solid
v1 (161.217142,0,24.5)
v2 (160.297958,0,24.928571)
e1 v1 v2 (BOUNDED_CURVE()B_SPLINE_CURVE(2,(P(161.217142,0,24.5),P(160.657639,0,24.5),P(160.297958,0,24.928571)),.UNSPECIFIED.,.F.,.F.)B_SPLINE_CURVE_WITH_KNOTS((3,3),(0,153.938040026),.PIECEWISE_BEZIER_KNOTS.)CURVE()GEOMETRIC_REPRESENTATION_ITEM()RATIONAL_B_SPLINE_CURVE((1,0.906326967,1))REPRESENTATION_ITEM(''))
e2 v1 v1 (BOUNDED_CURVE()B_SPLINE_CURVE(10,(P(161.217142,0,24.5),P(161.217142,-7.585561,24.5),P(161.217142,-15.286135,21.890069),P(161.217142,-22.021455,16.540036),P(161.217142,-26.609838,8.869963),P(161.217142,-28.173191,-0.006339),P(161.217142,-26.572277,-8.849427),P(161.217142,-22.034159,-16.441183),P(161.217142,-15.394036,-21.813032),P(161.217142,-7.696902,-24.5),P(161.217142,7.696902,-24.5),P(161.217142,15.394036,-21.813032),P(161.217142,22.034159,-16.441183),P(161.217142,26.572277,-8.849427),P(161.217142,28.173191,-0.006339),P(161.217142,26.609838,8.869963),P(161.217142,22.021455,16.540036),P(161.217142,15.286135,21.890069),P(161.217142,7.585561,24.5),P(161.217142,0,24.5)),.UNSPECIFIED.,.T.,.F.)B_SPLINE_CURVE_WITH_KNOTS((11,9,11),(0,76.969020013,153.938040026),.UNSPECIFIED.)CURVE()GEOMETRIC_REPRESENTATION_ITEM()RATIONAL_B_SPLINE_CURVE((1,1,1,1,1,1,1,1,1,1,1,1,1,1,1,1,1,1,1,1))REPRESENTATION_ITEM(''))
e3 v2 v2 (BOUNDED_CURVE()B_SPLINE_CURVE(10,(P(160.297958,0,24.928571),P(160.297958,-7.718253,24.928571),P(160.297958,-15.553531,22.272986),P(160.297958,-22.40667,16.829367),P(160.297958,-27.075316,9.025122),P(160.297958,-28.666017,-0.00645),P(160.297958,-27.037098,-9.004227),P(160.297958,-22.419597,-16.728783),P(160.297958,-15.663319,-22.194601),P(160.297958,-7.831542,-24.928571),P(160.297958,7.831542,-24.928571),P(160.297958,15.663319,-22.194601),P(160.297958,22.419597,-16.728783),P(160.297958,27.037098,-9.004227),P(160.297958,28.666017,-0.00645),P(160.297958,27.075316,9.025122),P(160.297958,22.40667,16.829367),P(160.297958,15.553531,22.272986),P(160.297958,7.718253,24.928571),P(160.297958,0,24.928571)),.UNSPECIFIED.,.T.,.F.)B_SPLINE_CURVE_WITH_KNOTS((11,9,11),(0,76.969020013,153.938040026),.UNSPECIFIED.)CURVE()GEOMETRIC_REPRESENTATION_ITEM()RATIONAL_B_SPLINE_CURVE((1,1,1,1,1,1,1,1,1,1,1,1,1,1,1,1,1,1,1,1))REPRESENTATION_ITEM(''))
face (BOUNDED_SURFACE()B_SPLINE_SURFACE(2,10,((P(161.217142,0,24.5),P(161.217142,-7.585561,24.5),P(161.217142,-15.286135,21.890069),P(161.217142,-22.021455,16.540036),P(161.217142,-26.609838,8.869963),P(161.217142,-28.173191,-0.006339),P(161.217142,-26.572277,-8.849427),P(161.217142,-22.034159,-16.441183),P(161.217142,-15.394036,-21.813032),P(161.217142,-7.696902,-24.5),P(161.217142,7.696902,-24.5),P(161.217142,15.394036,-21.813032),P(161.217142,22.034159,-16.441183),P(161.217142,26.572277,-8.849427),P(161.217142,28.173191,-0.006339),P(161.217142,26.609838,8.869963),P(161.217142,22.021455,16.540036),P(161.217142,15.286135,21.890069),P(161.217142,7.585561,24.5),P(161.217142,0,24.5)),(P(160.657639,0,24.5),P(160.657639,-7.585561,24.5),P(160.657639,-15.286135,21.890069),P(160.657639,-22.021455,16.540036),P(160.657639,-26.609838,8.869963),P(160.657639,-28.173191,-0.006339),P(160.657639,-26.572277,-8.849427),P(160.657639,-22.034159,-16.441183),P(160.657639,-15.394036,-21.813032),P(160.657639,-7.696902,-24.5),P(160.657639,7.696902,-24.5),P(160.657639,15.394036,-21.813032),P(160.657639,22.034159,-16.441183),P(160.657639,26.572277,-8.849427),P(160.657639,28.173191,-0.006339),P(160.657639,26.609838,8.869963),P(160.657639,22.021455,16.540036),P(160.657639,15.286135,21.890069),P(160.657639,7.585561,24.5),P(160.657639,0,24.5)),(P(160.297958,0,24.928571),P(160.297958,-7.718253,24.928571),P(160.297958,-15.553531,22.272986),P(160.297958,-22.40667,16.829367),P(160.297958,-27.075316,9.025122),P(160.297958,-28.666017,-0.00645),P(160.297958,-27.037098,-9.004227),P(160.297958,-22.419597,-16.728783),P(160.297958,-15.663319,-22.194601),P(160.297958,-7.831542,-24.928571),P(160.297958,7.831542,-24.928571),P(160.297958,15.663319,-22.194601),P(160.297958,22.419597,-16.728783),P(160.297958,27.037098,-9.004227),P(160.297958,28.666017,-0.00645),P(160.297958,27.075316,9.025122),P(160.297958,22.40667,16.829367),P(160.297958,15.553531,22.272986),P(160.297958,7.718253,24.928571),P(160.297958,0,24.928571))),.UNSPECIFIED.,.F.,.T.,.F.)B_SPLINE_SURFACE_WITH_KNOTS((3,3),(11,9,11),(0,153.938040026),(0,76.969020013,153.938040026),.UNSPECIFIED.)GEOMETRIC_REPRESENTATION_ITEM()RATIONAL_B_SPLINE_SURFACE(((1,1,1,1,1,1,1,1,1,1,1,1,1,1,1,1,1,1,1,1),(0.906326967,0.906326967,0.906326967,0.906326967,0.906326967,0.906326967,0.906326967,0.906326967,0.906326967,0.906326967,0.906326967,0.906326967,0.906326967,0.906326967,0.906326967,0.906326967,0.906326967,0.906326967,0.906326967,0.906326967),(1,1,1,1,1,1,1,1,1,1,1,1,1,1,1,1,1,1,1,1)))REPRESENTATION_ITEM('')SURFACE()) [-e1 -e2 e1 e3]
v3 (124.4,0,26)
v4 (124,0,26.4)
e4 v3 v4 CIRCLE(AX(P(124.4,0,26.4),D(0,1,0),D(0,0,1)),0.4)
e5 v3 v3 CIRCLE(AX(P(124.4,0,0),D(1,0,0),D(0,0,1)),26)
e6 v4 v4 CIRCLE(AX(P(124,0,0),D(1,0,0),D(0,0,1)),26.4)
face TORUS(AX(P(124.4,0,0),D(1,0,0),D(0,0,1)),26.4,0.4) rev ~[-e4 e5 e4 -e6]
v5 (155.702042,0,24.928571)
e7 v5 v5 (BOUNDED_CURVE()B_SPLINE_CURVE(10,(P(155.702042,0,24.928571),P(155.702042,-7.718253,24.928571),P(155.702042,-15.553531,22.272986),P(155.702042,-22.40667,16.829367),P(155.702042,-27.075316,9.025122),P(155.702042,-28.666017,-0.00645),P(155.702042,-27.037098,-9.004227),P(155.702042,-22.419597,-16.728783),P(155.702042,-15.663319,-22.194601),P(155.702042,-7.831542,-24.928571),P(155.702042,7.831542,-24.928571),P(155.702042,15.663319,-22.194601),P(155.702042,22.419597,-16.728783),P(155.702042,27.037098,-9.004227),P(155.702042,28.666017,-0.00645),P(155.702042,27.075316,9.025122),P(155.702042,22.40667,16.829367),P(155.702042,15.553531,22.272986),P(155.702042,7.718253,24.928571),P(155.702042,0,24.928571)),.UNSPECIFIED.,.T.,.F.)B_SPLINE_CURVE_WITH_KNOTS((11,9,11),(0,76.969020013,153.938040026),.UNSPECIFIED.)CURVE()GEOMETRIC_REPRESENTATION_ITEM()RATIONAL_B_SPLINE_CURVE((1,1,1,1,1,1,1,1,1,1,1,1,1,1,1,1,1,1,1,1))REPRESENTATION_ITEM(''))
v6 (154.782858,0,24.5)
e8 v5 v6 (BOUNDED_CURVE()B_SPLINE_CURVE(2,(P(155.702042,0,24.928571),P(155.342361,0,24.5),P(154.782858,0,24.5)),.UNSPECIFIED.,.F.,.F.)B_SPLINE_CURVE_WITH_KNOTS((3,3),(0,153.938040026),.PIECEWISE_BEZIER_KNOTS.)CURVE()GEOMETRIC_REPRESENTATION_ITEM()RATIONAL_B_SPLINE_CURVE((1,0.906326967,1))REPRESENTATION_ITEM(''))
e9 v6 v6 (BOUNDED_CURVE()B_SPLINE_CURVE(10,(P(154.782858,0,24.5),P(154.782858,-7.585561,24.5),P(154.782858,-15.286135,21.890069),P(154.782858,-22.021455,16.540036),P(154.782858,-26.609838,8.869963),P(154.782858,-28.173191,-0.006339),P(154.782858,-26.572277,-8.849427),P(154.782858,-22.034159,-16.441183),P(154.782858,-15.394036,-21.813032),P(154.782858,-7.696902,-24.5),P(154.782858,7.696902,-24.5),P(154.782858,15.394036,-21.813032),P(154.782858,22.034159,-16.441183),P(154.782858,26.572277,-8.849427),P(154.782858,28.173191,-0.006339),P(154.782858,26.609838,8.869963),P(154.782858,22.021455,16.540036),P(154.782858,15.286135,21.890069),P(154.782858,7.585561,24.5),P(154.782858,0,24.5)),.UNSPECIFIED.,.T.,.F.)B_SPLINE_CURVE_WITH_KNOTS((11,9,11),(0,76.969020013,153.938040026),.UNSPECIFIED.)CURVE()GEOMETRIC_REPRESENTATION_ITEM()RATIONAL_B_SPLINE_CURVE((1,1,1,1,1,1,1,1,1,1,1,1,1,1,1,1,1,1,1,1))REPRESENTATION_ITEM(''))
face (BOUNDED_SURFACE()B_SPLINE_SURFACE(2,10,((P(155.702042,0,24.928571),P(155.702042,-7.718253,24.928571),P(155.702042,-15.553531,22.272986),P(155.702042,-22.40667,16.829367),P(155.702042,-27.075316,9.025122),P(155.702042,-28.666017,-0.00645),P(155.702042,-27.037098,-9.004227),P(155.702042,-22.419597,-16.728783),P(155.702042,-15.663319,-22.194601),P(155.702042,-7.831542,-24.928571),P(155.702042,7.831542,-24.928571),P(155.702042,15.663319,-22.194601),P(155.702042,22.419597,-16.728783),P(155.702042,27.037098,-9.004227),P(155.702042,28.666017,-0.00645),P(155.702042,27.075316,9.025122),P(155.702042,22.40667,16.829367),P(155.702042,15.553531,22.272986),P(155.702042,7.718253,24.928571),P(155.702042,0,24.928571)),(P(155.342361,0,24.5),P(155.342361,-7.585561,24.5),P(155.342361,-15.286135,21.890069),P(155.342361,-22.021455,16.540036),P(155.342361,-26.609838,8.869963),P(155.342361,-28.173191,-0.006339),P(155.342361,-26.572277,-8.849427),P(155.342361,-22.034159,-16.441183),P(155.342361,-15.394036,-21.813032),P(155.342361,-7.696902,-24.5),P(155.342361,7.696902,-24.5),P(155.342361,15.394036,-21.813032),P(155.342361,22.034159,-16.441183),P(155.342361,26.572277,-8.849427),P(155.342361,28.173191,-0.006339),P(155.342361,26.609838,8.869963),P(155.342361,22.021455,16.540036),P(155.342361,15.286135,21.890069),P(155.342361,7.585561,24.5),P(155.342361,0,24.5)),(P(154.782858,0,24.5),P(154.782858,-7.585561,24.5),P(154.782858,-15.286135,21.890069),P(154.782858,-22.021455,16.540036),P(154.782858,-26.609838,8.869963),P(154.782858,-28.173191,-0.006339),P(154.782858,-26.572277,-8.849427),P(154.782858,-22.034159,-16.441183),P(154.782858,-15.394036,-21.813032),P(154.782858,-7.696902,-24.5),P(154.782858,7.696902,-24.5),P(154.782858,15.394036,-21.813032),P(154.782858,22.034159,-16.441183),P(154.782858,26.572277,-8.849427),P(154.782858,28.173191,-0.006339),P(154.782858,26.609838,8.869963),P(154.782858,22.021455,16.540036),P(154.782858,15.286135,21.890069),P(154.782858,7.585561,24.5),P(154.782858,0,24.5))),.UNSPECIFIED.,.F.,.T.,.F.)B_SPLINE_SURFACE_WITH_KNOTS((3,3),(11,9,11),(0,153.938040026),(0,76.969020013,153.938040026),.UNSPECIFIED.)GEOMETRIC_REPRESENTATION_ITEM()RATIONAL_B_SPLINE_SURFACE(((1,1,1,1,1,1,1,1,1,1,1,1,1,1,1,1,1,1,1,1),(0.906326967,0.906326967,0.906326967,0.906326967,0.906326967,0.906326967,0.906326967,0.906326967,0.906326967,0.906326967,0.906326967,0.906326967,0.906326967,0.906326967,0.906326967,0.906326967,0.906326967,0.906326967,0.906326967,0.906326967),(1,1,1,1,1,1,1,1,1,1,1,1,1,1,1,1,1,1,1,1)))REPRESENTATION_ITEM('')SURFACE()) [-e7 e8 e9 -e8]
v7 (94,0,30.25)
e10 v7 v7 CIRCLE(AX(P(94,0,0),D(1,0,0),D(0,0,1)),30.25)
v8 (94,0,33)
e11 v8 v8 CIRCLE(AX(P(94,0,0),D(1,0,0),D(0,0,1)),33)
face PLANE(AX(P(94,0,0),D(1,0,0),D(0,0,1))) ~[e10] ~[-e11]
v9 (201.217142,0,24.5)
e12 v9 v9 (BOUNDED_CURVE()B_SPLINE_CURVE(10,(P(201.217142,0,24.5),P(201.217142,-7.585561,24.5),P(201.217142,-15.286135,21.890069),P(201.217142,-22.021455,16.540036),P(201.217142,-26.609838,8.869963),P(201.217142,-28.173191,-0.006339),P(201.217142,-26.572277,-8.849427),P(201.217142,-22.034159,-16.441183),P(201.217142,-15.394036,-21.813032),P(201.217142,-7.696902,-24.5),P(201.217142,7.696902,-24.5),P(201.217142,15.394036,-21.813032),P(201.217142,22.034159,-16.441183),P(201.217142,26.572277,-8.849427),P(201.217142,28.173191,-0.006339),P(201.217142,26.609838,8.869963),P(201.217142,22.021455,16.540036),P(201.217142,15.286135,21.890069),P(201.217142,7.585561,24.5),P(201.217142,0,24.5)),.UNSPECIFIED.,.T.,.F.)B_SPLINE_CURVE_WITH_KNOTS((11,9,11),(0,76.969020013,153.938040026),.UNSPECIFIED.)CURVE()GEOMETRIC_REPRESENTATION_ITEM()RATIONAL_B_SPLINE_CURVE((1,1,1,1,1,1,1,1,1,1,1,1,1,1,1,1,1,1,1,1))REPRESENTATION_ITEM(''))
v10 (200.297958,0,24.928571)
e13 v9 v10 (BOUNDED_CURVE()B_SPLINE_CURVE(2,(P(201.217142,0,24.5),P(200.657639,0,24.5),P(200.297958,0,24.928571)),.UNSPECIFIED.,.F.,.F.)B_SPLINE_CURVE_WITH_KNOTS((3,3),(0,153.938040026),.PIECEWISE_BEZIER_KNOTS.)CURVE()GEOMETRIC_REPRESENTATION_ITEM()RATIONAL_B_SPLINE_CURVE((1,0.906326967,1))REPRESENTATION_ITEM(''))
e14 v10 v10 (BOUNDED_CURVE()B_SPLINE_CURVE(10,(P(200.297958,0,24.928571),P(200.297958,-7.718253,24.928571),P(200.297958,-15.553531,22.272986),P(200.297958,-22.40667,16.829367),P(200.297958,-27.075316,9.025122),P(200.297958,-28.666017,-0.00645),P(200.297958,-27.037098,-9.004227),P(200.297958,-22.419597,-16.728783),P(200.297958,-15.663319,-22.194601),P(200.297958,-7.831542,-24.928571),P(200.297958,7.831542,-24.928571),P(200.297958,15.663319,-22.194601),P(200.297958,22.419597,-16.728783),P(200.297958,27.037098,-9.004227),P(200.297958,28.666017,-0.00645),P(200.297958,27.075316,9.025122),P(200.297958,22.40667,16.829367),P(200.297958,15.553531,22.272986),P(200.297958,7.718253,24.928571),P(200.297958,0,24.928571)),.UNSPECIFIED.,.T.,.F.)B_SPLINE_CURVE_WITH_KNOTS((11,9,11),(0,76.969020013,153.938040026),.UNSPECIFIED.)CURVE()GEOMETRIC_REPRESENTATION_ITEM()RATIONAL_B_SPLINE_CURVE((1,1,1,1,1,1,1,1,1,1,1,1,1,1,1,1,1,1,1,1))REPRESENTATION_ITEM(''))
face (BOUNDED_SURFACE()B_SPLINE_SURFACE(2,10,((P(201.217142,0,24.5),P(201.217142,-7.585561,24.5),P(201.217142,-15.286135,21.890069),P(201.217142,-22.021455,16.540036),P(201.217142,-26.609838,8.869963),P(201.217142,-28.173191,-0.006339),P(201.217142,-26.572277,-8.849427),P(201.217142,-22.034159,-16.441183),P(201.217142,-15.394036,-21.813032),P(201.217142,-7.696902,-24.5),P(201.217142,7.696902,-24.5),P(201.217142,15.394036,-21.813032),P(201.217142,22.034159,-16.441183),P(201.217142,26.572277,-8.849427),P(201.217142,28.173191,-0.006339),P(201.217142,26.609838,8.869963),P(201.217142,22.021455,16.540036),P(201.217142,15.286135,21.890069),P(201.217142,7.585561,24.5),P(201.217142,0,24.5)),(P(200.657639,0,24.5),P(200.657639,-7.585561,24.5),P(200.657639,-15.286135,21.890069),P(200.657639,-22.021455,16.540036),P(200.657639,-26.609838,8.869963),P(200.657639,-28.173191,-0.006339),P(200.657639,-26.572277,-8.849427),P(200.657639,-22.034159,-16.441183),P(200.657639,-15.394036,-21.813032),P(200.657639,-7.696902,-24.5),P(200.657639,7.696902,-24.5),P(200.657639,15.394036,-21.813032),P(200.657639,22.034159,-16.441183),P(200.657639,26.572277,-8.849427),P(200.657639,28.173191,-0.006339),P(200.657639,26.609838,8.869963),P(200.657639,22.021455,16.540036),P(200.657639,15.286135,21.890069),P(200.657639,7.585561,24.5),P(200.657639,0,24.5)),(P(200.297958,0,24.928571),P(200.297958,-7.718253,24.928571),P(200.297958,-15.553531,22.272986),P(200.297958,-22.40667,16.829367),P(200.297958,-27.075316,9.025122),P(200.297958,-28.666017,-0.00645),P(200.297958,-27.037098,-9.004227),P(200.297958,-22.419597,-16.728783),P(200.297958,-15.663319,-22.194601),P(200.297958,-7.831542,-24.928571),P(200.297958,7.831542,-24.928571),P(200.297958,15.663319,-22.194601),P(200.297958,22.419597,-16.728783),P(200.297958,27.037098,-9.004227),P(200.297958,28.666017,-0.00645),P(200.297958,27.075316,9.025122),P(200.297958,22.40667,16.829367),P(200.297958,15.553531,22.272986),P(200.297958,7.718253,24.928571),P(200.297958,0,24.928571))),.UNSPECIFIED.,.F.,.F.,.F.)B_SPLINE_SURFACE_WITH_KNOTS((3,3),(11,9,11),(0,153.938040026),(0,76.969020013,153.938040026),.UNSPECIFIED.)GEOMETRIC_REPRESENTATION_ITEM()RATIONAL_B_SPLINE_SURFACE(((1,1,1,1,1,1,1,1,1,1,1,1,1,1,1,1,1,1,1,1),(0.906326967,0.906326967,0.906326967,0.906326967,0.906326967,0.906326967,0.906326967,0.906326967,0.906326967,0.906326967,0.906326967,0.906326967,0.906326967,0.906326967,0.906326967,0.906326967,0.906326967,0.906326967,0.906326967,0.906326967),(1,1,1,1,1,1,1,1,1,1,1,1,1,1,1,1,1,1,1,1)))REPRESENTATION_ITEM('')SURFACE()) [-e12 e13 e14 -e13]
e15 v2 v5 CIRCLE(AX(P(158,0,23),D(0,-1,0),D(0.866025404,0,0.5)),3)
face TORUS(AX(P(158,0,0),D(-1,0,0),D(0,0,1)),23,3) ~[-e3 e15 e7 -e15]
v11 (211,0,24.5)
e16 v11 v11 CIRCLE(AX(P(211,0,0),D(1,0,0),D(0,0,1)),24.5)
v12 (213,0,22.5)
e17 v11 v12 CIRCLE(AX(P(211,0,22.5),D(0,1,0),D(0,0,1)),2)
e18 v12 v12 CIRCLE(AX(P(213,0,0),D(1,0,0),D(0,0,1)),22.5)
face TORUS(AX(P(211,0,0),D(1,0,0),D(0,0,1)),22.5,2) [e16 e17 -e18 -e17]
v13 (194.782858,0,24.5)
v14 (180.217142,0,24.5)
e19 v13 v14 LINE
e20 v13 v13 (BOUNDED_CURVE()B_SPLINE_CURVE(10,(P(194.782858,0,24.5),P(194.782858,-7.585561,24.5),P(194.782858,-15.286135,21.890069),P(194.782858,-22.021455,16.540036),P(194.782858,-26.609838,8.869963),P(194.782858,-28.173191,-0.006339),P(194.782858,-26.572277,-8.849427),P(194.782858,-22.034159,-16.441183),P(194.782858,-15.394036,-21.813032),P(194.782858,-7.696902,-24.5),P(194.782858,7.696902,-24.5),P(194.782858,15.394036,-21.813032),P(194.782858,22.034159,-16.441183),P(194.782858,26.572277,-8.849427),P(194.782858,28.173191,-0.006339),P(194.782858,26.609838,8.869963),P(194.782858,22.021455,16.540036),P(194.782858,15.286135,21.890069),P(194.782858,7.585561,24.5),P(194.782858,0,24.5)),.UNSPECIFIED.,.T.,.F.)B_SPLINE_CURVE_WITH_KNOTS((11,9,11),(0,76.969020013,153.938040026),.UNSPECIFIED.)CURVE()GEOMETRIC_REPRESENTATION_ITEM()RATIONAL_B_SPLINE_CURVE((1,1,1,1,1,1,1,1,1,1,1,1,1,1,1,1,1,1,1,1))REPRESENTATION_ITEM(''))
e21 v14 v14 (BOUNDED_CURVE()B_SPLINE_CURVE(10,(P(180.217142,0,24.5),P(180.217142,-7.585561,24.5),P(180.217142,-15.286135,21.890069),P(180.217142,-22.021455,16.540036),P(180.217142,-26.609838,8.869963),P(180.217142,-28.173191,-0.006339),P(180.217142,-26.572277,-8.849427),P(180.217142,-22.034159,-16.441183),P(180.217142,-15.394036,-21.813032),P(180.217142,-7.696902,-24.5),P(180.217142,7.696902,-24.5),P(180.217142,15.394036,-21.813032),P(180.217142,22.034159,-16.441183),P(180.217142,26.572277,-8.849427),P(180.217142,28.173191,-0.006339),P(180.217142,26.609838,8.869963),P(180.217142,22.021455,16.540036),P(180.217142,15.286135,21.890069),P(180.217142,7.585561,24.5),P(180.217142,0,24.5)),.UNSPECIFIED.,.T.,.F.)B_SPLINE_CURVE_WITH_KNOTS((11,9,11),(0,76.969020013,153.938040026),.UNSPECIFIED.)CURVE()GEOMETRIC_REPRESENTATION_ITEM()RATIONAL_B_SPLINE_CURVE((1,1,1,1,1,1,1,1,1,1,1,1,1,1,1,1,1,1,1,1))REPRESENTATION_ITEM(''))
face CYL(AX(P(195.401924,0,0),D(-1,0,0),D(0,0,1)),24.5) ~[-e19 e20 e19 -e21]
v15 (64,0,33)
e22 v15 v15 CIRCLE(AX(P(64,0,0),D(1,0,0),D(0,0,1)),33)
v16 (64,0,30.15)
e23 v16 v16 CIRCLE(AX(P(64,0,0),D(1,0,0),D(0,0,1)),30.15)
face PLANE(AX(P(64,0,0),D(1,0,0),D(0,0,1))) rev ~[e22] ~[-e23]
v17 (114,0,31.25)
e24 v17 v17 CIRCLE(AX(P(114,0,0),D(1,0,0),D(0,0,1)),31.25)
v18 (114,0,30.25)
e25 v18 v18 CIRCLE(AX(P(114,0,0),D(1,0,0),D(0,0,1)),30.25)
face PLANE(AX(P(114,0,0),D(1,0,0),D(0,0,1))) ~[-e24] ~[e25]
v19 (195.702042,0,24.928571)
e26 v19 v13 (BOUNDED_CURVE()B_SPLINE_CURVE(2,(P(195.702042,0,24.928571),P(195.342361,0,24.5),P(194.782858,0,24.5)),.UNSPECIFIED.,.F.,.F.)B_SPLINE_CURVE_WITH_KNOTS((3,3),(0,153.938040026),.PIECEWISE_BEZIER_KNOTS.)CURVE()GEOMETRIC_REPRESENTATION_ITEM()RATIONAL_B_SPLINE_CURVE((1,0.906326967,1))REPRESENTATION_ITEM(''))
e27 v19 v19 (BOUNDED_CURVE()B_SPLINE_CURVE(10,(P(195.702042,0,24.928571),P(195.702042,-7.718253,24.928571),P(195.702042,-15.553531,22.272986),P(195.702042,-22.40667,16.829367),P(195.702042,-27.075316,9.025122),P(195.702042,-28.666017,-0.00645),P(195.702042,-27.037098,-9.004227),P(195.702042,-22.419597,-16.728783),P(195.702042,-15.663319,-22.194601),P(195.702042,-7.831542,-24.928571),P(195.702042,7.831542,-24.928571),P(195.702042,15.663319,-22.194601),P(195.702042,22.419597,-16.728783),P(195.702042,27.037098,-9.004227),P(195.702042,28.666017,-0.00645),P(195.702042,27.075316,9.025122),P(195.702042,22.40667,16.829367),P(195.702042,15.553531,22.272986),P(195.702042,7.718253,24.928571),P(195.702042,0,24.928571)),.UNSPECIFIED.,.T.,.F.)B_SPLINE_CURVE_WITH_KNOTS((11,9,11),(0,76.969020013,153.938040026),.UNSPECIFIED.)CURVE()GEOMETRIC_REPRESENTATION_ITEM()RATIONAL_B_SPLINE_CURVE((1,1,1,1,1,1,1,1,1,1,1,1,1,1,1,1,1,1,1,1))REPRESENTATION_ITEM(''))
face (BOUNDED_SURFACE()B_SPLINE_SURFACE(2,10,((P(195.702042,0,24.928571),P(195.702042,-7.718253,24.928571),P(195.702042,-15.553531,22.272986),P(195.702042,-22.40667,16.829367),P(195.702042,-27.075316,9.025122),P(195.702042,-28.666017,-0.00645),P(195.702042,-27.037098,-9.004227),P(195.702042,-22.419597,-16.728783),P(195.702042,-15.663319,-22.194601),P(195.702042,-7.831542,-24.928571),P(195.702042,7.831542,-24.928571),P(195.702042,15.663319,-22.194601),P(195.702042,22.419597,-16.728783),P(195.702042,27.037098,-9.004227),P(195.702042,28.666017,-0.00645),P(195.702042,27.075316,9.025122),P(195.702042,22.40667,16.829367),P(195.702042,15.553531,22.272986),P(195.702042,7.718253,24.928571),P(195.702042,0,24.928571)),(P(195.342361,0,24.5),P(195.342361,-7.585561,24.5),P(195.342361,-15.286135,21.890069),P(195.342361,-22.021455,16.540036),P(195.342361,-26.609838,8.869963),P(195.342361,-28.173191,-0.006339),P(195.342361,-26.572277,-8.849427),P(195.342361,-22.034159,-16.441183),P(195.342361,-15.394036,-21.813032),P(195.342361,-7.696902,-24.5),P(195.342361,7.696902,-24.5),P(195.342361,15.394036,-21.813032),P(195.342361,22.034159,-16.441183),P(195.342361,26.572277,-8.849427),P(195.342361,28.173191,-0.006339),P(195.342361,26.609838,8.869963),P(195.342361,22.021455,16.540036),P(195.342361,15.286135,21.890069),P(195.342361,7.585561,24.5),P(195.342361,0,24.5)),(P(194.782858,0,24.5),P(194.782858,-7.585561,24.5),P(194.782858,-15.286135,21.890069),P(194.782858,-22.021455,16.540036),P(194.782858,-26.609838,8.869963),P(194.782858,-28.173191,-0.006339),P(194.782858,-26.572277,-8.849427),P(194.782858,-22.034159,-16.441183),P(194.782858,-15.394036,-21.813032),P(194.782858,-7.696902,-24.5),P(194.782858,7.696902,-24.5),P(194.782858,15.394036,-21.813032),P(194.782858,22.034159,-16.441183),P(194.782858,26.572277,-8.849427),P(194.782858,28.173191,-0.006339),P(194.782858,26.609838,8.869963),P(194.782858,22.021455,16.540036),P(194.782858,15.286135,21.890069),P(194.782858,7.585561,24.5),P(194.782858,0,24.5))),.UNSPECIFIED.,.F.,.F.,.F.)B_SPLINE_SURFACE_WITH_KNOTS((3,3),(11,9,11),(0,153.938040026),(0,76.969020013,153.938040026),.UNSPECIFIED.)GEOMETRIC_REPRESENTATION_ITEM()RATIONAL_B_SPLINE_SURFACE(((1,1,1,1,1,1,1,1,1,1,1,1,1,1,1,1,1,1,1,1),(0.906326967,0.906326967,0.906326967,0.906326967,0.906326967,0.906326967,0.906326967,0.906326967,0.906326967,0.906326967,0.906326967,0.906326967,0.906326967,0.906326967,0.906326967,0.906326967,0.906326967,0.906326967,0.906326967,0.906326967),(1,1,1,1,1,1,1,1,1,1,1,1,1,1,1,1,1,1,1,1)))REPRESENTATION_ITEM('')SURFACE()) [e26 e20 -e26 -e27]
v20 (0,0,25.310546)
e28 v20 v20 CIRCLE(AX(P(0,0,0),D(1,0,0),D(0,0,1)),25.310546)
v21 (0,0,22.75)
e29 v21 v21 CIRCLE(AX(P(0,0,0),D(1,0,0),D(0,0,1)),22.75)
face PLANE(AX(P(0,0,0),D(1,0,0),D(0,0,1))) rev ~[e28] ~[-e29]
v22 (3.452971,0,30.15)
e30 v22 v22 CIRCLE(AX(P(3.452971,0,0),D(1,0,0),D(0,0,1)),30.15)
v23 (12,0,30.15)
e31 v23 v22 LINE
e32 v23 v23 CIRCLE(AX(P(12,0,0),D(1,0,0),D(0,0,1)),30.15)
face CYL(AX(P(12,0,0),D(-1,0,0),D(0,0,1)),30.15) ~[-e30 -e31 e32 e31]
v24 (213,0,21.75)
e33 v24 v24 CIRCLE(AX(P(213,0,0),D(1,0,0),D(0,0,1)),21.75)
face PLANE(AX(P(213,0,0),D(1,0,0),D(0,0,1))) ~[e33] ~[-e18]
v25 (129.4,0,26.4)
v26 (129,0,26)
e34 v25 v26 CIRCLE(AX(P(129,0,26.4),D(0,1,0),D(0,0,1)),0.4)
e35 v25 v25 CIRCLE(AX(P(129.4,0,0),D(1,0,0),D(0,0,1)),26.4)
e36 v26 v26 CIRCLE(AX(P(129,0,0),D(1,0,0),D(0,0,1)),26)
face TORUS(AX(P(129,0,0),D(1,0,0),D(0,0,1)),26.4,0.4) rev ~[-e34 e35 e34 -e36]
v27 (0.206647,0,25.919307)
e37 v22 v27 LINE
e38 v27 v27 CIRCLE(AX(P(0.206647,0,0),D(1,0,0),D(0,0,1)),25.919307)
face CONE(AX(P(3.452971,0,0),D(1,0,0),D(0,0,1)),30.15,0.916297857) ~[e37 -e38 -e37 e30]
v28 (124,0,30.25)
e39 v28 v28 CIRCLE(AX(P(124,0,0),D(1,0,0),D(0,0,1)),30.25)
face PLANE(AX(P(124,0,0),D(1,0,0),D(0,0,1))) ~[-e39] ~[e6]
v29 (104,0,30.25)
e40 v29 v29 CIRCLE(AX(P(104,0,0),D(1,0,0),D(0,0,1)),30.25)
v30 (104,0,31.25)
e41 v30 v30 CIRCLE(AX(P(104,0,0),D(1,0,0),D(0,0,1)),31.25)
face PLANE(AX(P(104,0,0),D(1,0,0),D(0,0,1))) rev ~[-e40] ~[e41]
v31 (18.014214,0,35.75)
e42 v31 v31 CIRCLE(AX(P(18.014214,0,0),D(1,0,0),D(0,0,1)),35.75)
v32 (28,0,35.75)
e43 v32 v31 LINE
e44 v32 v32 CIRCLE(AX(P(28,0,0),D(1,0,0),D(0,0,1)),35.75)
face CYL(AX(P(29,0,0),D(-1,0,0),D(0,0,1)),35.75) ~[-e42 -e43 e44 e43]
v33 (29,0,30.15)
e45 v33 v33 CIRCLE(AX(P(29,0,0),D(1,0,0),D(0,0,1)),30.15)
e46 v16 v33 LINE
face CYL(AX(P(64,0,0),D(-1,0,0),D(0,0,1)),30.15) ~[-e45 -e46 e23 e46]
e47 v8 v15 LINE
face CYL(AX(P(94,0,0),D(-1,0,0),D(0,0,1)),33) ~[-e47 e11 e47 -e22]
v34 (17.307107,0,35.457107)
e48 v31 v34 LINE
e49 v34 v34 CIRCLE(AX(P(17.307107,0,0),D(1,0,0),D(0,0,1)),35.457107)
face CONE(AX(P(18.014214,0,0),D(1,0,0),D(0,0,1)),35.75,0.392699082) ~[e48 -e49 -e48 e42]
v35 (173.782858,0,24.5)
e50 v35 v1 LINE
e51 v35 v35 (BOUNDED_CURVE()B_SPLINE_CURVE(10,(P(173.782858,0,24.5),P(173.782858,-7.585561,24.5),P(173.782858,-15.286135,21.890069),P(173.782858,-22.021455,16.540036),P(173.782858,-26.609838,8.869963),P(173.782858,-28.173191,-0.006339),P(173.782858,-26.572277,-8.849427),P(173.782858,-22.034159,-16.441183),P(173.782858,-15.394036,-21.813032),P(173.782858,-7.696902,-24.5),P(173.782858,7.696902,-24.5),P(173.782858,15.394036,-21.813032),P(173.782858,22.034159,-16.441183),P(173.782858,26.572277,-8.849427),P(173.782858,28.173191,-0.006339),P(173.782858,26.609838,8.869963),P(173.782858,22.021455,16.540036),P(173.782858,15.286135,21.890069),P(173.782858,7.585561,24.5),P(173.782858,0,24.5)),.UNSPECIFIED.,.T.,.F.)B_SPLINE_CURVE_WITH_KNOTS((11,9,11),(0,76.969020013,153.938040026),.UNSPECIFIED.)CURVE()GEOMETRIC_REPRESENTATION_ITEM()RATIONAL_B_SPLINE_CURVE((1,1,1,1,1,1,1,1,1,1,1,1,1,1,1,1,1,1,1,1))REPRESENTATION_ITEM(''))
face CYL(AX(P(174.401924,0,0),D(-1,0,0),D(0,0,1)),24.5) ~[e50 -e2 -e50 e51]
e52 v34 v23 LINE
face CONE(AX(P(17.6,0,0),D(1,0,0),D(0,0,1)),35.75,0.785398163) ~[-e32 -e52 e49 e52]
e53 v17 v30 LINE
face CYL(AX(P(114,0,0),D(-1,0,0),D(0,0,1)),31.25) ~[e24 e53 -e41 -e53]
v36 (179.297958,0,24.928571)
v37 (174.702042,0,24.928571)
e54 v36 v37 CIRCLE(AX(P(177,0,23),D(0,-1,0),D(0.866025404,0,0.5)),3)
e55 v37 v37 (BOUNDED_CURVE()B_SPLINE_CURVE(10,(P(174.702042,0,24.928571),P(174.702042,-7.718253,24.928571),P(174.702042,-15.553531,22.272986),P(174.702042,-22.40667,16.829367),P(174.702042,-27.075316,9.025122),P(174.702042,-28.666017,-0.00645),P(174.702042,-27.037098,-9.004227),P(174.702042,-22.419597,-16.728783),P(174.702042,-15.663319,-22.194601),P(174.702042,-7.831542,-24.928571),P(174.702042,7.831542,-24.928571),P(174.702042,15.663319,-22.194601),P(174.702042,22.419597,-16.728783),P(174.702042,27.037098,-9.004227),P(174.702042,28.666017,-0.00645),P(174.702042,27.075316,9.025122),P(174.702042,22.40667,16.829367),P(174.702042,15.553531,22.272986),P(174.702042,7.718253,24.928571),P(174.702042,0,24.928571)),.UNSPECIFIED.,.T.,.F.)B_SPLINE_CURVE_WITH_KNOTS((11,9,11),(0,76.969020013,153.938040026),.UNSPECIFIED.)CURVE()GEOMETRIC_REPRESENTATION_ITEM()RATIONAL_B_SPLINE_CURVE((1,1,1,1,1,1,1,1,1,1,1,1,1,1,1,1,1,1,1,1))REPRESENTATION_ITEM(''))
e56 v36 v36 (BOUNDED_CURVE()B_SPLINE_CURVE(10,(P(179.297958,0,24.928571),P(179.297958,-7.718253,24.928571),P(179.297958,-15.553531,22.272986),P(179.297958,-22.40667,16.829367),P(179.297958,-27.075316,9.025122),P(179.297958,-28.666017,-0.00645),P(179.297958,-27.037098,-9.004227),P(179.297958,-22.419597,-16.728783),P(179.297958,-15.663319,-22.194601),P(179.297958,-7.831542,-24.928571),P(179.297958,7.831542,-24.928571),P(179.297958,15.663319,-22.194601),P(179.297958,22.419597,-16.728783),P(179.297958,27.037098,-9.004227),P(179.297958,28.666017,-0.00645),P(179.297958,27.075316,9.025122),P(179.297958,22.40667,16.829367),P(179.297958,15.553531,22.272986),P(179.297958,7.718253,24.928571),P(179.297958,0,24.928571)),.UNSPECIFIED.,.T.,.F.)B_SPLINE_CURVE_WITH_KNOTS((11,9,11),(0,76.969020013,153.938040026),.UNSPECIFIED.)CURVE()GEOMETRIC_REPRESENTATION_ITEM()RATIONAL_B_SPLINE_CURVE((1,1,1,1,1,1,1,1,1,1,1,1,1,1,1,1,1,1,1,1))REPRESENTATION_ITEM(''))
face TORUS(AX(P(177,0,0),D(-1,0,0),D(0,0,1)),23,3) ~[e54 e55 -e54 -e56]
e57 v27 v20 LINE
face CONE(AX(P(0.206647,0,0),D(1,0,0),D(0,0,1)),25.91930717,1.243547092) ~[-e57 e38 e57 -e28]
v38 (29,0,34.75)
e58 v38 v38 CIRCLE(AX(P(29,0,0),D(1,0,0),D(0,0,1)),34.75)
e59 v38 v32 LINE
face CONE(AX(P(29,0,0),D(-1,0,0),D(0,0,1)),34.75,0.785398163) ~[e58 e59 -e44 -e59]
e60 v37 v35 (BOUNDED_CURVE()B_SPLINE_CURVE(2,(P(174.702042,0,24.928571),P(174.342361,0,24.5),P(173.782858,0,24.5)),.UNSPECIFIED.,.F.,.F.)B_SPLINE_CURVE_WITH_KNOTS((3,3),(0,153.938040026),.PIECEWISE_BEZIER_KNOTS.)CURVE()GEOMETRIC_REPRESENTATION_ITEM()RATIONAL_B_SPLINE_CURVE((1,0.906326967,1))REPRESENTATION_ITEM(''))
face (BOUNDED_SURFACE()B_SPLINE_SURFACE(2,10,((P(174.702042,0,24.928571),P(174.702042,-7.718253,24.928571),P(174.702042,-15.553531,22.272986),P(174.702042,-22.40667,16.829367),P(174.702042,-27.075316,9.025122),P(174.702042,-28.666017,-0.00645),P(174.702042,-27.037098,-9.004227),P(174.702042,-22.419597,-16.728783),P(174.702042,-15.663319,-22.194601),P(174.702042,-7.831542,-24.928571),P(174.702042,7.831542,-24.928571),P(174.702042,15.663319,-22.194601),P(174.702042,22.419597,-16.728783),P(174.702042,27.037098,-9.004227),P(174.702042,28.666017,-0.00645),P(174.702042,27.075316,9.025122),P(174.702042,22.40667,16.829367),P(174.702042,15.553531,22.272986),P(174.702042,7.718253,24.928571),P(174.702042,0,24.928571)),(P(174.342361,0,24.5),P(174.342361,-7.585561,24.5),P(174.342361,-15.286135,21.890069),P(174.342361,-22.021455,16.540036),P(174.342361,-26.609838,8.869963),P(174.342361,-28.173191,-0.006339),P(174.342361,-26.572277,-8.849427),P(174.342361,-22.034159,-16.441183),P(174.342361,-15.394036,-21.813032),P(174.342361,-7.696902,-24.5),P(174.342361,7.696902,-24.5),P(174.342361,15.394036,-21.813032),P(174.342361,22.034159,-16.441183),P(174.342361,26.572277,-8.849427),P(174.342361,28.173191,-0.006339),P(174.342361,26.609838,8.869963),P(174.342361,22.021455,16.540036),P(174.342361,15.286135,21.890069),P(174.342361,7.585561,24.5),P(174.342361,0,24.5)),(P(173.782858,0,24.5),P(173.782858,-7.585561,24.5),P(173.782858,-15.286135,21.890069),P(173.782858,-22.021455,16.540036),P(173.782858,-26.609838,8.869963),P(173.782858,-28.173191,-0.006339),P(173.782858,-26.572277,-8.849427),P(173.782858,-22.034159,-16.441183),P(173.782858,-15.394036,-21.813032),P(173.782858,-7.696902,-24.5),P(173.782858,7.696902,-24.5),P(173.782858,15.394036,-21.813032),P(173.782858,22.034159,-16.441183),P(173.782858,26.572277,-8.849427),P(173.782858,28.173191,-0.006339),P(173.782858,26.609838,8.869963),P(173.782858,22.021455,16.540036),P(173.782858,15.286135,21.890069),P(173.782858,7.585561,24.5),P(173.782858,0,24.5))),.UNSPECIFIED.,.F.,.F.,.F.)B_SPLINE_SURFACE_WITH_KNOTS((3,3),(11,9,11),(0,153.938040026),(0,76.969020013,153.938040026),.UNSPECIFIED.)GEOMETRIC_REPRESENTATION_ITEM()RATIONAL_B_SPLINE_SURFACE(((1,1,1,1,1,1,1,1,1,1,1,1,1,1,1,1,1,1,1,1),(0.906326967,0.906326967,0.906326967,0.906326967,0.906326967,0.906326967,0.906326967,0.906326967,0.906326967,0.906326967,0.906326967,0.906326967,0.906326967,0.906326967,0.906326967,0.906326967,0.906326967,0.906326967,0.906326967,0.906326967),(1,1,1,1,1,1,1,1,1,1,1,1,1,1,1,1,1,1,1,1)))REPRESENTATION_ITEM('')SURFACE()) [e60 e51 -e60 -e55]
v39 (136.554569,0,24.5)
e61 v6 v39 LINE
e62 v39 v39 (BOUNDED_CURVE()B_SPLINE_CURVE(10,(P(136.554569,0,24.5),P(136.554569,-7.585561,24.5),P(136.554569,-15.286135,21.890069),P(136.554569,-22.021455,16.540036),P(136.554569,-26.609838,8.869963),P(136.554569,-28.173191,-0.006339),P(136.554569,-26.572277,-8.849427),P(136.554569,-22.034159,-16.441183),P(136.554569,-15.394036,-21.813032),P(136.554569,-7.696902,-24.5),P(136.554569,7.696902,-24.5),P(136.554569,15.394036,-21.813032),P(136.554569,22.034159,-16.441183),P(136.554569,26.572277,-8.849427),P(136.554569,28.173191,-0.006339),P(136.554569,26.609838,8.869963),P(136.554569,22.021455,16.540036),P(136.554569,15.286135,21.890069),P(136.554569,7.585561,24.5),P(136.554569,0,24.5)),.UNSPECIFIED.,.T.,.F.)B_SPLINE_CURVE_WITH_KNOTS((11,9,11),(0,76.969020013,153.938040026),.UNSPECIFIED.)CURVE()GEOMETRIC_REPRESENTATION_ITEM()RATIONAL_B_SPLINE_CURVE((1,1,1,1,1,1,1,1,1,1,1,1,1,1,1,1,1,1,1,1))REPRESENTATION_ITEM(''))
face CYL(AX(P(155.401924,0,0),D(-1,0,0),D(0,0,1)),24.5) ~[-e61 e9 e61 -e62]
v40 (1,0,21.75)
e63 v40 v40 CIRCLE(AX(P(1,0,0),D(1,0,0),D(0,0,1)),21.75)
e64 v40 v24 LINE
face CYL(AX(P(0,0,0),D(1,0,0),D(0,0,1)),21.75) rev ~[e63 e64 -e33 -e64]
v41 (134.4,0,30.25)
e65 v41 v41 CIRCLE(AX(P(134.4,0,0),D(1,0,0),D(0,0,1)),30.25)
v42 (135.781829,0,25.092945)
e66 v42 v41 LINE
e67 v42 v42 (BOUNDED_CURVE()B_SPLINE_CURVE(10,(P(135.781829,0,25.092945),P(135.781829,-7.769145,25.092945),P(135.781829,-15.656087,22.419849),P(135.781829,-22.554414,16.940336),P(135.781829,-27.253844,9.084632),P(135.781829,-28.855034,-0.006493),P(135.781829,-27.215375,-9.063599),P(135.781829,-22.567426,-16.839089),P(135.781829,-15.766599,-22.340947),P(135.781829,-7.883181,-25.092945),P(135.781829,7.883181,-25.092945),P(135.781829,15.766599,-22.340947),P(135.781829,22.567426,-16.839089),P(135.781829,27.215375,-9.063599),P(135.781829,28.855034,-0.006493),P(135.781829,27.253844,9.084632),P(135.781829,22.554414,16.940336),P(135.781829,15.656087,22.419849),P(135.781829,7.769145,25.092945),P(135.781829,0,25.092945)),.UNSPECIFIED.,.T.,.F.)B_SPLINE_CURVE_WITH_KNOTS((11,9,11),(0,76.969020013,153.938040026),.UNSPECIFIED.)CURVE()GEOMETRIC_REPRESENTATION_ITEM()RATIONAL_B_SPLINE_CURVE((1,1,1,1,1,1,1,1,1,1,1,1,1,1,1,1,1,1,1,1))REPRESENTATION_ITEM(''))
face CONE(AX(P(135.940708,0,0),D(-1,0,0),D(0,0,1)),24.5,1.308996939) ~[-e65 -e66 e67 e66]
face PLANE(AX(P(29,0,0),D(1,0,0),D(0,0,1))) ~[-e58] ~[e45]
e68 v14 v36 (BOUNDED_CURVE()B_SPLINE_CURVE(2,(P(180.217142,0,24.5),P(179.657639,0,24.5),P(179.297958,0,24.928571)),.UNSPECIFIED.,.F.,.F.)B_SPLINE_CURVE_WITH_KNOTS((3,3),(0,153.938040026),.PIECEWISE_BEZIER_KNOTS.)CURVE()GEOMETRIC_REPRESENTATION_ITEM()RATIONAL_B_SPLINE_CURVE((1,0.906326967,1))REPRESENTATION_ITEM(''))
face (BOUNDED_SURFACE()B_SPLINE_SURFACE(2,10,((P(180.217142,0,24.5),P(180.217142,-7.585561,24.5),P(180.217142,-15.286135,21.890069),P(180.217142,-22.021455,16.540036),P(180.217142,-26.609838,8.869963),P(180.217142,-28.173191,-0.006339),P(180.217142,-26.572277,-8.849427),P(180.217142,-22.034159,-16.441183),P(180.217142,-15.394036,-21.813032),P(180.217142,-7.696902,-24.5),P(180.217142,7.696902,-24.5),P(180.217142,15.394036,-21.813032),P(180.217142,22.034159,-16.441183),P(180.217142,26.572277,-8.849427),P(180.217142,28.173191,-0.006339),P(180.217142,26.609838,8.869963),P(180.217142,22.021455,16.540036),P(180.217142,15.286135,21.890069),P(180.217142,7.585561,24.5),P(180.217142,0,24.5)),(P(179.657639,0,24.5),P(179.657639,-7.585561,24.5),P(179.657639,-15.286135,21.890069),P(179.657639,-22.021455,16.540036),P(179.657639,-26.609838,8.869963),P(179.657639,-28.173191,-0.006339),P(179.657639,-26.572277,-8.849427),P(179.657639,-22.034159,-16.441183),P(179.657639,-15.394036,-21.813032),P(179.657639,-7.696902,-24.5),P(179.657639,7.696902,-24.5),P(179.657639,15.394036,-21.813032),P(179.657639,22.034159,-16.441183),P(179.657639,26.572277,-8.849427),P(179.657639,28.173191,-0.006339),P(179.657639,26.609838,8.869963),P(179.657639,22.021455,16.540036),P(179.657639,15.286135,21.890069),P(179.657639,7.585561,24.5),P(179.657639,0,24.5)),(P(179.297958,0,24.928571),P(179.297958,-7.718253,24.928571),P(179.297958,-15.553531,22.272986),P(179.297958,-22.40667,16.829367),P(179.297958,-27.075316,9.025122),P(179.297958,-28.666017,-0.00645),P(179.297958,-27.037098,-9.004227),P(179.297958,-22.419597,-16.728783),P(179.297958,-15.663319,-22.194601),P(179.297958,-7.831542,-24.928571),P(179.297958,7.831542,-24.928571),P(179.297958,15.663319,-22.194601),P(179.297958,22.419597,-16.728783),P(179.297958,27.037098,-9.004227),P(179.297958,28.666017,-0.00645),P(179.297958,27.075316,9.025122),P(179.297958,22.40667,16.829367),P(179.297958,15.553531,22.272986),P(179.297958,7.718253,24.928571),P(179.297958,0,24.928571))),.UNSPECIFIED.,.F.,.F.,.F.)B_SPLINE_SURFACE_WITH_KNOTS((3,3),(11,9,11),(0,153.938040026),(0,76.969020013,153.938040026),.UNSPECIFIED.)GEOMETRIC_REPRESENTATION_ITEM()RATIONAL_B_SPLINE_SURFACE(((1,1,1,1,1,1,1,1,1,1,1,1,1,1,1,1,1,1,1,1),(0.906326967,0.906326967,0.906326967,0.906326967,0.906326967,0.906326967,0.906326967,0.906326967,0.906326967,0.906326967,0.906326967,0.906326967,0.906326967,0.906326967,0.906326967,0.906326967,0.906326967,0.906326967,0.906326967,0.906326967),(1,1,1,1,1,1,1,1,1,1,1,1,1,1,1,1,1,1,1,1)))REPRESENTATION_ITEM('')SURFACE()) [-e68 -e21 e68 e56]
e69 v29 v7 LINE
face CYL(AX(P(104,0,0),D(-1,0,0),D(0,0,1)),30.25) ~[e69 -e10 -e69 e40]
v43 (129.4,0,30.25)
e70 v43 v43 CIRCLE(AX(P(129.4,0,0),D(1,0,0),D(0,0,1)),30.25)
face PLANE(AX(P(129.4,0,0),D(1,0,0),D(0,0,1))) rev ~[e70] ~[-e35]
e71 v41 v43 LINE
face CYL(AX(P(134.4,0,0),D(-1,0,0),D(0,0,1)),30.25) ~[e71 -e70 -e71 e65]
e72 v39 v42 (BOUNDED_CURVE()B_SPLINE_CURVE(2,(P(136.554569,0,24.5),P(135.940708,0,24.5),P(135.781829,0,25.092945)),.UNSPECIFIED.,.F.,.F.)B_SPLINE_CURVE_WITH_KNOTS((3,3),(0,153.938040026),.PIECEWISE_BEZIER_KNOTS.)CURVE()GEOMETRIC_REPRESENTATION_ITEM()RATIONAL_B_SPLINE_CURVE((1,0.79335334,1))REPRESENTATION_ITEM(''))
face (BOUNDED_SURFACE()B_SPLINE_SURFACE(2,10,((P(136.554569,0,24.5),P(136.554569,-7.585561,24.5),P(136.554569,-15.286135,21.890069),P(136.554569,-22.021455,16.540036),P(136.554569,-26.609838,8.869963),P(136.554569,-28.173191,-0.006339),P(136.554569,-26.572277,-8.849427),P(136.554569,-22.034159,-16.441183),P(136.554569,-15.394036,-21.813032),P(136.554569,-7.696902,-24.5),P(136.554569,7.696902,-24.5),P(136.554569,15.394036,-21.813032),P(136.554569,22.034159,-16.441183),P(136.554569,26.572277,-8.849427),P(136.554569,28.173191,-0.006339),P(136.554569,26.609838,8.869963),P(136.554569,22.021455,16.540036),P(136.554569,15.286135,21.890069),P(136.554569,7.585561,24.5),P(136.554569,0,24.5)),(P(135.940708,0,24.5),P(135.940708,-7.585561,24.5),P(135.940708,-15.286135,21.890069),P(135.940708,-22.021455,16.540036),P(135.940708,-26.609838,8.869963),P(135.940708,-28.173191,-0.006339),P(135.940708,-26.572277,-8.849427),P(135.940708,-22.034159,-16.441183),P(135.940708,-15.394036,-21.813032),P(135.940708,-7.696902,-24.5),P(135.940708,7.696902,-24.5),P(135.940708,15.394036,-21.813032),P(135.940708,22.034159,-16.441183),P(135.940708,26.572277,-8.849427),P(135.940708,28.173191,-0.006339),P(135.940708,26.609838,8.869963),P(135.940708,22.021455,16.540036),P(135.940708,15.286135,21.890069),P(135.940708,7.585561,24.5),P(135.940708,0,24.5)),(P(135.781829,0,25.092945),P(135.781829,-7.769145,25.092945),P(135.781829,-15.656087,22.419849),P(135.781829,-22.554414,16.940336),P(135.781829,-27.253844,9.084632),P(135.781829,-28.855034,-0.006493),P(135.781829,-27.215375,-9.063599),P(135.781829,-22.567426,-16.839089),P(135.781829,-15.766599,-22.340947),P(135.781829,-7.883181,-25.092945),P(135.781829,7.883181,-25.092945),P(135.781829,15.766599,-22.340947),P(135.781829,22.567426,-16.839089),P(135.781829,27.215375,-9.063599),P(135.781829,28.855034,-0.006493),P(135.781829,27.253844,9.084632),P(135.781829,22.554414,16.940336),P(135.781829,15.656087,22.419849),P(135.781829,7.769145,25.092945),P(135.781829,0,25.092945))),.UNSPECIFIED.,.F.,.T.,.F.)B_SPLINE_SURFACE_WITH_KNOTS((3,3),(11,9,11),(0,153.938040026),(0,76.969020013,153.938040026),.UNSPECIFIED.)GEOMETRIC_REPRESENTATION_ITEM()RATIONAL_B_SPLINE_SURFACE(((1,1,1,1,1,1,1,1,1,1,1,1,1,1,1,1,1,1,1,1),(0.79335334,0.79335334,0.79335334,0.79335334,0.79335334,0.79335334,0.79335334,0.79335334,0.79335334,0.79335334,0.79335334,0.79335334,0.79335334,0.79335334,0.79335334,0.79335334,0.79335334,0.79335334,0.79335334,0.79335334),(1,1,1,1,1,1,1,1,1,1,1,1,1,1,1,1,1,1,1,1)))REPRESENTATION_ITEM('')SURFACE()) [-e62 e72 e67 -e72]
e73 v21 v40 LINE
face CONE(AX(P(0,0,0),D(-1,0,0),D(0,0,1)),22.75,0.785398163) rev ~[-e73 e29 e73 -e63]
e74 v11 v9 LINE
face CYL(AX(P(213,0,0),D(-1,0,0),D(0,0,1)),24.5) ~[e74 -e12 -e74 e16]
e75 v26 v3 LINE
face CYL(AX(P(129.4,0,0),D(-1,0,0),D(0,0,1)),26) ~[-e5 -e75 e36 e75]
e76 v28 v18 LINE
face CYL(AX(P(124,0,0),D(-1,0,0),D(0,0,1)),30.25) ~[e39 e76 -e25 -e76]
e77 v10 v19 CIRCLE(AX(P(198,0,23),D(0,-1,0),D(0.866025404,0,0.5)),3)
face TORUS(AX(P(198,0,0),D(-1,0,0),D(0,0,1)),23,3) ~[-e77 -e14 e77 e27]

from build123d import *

# Parameters (mm, degrees)
F2_R = 1.2
F3_R = 2
F4_R = 0.8
F5_R = 0.4


# Not quite as in the source:
# - a fillet or chamfer that OpenCascade refuses, or shapes differently, is made with other operations: its cross-section is extruded or revolved along the edge and cut away or added


with BuildPart() as f1:
    # F0 (on Front) → F1 (revolve)
    with BuildSketch(Plane.XZ):
        with BuildLine():
            Line((0, 21.75), (213, 21.75))
            Line((213, 21.75), (213, 24.5))
            Line((213, 24.5), (200.5980762114, 24.5))
            ThreePointArc((200.5980762114, 24.5), (198, 26), (195.4019237886, 24.5))
            Line((195.4019237886, 24.5), (179.5980762114, 24.5))
            ThreePointArc((179.5980762114, 24.5), (177, 26), (174.4019237886, 24.5))
            Line((174.4019237886, 24.5), (160.5980762114, 24.5))
            ThreePointArc((160.5980762114, 24.5), (158, 26), (155.4019237886, 24.5))
            Line((155.4019237886, 24.5), (135.9407078565, 24.5))
            Line((135.9407078565, 24.5), (134.4, 30.25))
            Line((134.4, 30.25), (129.4, 30.25))
            Line((129.4, 30.25), (129.4, 26))
            Line((129.4, 26), (124, 26))
            Line((124, 26), (124, 30.25))
            Line((124, 30.25), (114, 30.25))
            Line((114, 30.25), (114, 31.25))
            Line((114, 31.25), (104, 31.25))
            Line((104, 31.25), (104, 30.25))
            Line((104, 30.25), (94, 30.25))
            Line((94, 30.25), (94, 33))
            Line((94, 33), (64, 33))
            Line((64, 33), (64, 30.15))
            Line((64, 30.15), (29, 30.15))
            Line((29, 30.15), (29, 35.75))
            Line((29, 35.75), (17.6, 35.75))
            Line((17.6, 35.75), (12, 30.15))
            Line((12, 30.15), (3.4529714459, 30.15))
            Line((3.4529714459, 30.15), (0, 25.65))
            Line((0, 25.65), (0, 21.75))
        make_face()
    revolve(axis=Axis((44.485598996, 0, 0), (1, 0, 0)))

    # F2
    f2_edges = [f1.edges().sort_by_distance(p)[0] for p in [
        (200.598076, 0, -24.5),
        (179.598076, 0, -24.5),
        (160.598076, 0, -24.5),
        (155.401924, 0, -24.5),
        (174.401924, 0, -24.5),
        (195.401924, 0, -24.5),
    ]]
    fillet(f2_edges, radius=F2_R)

    # F3
    f3_edges = [f1.edges().sort_by_distance(p)[0] for p in [
        (213, 0, -24.5),
    ]]
    fillet(f3_edges, radius=F3_R)

    # F4
    f4_edges = [f1.edges().sort_by_distance(p)[0] for p in [
        (135.940708, 0, -24.5),
    ]]
    fillet(f4_edges, radius=F4_R)

    # F5
    f5_edges = [f1.edges().sort_by_distance(p)[0] for p in [
        (124, 0, -26),
        (129.4, 0, -26),
    ]]
    fillet(f5_edges, radius=F5_R)

    # F6: chamfer of 1 on 4 edges, made by hand

    # F6_s1 → F6_t2 (revolve, cut)
    with BuildSketch(Plane.XZ):
        Polygon((29, 34.75), (28, 35.75), (29, 35.75), align=None)
    revolve(axis=Axis((29, 0, 0), (1, 0, 0)), mode=Mode.SUBTRACT)

    # F6_s3 → F6_t4 (revolve, cut)
    with BuildSketch(Plane.XZ):
        Polygon((18.0142135624, 35.75), (17.3071067812, 35.4571067812), (17.6, 35.75), align=None)
    revolve(axis=Axis((17.6, 0, 0), (1, 0, 0)), mode=Mode.SUBTRACT)

    # F6_s5 → F6_t6 (revolve, cut)
    with BuildSketch(Plane.XZ):
        Polygon((0.2066466597, 25.9193071701), (0, 25.3105457411), (0, 25.65), align=None)
    revolve(axis=Axis((0, 0, 0), (1, 0, 0)), mode=Mode.SUBTRACT)

    # F6_s7 → F6_t8 (revolve, cut)
    with BuildSketch(Plane.XZ):
        Polygon((0, 22.75), (1, 21.75), (0, 21.75), align=None)
    revolve(axis=Axis((0, 0, 0), (1, 0, 0)), mode=Mode.SUBTRACT)


solid = f1.part
